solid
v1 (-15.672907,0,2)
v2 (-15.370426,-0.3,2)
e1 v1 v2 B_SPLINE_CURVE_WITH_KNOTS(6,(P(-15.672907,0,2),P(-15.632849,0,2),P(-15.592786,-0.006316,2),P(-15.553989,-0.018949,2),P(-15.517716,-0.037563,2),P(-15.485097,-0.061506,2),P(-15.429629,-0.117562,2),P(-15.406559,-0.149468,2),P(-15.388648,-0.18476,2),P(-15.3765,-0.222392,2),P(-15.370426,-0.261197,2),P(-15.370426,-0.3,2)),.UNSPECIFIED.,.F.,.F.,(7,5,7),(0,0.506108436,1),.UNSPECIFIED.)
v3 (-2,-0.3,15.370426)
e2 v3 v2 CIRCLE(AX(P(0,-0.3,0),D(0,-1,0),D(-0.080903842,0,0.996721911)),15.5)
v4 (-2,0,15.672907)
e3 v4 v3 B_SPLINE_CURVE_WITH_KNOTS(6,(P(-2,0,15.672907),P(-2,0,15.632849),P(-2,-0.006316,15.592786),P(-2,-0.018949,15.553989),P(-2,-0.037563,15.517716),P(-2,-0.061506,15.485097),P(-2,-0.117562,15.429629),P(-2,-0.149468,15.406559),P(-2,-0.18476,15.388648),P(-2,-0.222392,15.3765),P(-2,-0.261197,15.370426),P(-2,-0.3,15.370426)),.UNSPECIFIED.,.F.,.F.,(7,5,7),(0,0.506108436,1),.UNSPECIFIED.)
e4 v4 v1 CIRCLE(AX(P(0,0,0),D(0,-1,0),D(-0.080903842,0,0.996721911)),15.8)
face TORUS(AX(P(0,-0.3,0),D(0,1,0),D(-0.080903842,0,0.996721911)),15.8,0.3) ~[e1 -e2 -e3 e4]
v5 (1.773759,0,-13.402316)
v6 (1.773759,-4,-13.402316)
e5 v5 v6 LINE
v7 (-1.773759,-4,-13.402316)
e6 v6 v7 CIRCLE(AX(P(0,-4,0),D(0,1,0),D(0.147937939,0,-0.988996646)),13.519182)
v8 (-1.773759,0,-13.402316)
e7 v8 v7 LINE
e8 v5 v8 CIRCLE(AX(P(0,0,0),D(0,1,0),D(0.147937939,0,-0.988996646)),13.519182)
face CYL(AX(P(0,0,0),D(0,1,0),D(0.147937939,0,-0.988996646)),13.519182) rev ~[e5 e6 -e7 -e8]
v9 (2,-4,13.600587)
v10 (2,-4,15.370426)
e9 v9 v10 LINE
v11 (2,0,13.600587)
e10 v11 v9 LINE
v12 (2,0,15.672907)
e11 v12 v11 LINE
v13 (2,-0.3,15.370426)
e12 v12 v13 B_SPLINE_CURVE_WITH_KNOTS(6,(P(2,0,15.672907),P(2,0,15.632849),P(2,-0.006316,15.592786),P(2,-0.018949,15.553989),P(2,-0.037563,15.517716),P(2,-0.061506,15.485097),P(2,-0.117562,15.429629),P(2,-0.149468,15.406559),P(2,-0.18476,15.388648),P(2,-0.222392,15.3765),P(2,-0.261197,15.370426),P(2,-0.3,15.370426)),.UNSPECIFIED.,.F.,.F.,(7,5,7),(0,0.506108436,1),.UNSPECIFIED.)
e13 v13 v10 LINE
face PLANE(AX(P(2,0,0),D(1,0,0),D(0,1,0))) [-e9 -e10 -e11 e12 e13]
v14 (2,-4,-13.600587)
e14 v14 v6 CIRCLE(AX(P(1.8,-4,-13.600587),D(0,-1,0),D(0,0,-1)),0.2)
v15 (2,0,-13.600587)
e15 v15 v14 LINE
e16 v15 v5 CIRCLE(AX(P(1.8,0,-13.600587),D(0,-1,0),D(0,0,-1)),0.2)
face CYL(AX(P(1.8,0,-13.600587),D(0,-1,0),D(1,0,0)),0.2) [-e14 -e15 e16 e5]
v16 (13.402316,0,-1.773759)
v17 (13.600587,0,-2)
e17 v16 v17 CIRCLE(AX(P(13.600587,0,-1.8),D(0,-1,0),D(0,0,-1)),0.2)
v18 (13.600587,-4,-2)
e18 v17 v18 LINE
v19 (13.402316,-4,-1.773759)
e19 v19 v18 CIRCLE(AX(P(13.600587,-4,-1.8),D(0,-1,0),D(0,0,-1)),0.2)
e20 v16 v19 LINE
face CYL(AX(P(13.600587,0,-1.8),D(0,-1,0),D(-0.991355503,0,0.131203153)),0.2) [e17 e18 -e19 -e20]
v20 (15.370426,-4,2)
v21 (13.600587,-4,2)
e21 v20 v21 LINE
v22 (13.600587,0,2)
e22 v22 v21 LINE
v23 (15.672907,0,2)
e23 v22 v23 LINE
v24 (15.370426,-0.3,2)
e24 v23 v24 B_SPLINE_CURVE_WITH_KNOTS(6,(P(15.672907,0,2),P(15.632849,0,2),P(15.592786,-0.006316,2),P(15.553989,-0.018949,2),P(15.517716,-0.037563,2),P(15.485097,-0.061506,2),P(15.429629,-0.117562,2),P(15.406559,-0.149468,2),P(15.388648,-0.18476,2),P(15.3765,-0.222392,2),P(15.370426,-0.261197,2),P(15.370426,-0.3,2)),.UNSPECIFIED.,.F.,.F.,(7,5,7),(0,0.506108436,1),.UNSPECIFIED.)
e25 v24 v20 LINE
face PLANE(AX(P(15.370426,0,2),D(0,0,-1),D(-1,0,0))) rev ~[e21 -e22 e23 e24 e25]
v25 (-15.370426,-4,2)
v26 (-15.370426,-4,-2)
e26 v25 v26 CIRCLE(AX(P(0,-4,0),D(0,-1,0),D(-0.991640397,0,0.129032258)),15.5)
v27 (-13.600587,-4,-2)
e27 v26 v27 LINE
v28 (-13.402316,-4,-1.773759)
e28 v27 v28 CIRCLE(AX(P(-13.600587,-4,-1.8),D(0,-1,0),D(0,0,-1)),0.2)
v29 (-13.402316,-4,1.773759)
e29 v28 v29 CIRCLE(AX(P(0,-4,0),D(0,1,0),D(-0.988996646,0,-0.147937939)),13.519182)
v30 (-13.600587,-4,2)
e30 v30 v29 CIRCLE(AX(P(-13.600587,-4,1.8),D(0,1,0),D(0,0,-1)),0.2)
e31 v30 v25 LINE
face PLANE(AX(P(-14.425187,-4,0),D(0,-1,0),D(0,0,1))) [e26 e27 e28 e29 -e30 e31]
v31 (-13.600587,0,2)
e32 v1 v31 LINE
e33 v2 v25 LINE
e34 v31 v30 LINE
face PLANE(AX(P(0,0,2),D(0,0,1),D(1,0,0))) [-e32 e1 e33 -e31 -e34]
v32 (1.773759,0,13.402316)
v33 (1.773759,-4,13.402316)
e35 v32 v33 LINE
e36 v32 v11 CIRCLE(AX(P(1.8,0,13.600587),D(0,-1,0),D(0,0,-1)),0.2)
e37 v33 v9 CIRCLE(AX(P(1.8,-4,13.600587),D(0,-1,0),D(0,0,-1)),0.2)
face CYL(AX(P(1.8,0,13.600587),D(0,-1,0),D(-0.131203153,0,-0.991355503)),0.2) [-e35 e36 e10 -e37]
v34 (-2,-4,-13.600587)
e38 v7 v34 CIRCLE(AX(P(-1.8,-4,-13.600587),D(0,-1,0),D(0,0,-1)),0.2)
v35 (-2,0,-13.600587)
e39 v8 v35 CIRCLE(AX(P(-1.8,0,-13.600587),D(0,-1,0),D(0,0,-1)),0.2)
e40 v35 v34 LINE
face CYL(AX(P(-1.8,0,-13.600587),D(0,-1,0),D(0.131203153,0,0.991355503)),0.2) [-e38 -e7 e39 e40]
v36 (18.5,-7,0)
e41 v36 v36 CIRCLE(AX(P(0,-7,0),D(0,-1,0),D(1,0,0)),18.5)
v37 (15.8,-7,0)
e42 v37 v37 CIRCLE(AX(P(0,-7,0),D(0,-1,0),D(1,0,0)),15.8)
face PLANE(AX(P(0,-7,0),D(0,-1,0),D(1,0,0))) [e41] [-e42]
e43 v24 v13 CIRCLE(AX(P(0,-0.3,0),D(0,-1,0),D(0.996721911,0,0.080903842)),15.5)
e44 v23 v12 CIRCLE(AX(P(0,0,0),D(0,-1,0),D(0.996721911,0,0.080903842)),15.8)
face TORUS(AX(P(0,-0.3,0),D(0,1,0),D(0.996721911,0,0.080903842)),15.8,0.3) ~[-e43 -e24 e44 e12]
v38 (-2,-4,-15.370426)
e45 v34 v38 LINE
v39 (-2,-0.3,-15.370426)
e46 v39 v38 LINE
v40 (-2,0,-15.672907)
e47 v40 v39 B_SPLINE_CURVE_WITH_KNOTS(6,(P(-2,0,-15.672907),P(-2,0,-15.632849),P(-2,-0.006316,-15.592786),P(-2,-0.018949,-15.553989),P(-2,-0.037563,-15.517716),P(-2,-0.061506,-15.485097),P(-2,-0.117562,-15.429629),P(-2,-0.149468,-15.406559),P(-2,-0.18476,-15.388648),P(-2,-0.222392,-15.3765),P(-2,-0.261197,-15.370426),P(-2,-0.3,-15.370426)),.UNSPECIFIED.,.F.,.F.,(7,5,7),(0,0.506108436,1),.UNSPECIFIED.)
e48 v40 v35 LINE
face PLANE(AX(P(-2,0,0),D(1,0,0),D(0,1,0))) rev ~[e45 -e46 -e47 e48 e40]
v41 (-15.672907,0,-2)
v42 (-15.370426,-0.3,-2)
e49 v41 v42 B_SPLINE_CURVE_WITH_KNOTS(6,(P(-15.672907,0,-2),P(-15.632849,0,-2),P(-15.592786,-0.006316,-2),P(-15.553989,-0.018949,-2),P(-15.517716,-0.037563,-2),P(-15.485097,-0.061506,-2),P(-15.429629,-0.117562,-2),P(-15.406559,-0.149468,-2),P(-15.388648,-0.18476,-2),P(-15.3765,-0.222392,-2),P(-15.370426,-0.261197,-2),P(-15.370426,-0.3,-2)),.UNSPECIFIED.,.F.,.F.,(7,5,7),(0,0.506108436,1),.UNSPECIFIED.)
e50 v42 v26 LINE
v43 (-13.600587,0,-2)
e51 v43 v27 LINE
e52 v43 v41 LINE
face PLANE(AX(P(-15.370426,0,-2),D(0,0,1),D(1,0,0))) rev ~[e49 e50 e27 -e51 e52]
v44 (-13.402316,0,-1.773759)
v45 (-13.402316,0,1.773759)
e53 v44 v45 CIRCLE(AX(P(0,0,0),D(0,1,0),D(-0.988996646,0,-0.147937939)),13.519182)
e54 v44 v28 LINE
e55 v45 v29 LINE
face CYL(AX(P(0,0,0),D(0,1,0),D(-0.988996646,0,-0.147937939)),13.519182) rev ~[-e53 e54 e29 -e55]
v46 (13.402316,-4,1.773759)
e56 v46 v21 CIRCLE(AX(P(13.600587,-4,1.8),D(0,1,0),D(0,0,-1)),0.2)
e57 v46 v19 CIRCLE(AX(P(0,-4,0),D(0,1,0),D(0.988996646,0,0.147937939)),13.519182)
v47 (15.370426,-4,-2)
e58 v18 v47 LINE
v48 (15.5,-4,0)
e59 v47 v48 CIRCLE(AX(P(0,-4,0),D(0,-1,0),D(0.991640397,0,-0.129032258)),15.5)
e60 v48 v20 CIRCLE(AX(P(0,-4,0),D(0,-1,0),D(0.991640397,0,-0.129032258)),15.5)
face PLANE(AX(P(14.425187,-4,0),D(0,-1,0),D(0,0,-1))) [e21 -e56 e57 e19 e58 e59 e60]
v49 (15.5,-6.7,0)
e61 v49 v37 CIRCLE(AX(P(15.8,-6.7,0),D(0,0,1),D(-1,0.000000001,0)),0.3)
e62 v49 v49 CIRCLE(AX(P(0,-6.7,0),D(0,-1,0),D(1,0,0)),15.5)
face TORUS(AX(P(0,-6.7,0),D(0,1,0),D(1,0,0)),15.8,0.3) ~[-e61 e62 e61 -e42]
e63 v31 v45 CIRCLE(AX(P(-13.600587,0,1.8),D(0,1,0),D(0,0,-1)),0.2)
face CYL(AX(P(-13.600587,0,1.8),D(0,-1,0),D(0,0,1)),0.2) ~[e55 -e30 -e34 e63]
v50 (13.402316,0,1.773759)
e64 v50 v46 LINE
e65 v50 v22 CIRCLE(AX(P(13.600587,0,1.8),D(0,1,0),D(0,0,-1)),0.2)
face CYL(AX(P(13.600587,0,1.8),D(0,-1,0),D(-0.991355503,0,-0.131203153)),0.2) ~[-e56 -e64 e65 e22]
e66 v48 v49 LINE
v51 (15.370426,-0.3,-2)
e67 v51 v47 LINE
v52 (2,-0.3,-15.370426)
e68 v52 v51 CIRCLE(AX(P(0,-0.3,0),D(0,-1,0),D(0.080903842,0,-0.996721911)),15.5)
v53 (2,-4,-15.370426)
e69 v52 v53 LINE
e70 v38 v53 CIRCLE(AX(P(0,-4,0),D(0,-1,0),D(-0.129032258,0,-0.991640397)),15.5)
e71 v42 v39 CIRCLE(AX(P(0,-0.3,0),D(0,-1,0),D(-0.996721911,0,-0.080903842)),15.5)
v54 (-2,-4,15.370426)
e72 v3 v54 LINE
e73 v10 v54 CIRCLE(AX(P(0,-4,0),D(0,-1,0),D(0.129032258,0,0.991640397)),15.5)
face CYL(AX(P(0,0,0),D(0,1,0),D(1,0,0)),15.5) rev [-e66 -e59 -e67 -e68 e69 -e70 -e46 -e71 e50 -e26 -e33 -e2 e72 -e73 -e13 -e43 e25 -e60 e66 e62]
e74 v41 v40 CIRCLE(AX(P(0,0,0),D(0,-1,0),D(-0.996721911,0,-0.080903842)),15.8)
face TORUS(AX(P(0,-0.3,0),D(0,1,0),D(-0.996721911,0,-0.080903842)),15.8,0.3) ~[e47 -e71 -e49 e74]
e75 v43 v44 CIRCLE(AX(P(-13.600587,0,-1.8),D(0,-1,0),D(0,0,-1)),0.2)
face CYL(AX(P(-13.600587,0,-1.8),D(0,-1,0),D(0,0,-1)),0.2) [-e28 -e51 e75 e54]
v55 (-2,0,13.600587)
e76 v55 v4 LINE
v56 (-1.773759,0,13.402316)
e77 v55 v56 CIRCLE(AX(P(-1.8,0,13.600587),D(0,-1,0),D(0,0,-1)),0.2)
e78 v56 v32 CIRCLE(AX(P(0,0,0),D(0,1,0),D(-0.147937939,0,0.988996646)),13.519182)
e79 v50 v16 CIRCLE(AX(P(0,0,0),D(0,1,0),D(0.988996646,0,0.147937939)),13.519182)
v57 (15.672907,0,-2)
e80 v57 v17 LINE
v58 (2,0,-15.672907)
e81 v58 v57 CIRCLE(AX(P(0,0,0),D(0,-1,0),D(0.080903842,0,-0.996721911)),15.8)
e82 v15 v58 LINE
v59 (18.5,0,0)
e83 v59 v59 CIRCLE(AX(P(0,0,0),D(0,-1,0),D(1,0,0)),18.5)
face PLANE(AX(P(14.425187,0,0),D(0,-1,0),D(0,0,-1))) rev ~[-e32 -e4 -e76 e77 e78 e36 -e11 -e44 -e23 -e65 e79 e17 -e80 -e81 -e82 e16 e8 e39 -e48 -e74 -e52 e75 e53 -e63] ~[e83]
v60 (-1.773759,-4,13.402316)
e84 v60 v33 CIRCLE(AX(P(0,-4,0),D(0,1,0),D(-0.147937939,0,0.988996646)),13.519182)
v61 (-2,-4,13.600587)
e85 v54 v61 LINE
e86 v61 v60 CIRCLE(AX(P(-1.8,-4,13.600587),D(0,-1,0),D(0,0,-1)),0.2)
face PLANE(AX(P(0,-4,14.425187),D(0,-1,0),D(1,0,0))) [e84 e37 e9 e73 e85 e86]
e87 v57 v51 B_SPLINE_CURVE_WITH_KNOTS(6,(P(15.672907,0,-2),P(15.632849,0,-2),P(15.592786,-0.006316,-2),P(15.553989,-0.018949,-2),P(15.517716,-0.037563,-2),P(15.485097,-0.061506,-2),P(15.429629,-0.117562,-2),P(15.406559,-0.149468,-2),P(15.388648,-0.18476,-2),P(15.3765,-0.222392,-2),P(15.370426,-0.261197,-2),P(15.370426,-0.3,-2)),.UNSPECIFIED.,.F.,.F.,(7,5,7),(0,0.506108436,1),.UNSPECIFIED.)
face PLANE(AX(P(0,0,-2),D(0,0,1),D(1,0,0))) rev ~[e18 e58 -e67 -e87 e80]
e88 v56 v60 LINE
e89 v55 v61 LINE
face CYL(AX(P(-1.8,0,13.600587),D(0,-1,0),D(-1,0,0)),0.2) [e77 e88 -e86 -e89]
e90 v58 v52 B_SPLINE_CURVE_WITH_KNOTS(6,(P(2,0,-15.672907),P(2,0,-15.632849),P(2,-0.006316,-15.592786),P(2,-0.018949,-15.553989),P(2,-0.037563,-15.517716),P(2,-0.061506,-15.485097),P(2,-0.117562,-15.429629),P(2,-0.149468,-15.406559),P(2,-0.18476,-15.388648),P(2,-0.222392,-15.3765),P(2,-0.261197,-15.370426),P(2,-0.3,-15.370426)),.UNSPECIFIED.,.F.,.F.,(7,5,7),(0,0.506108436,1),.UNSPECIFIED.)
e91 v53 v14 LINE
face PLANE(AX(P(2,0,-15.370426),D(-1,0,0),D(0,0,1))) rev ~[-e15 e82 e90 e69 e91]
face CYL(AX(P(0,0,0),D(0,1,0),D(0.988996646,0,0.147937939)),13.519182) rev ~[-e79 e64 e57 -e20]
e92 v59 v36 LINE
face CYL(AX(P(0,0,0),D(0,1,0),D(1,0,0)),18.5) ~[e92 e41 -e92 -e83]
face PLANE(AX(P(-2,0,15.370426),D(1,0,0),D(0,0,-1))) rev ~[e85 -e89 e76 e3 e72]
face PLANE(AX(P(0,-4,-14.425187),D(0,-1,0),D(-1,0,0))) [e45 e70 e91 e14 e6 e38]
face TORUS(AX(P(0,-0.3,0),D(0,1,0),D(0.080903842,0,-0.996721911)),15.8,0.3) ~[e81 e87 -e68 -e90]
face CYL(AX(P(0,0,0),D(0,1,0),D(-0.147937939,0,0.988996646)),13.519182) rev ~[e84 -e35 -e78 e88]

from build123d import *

# Parameters (mm, degrees)
F0_R            = 18.5
F0_R_2          = 15.5
F1_DEPTH        = 7
F3_DEPTH        = 4
F3_COPIES_COUNT = 4
F4_R            = 0.2
F5_T6_ANGLE     = 80.7189590371
F5_T12_ANGLE    = 80.7189590371
F5_T18_ANGLE    = 80.7189590371
F5_T24_ANGLE    = 80.7189590371


# Not quite as in the source:
# - a fillet or chamfer that OpenCascade refuses, or shapes differently, is made with other operations: its cross-section is extruded or revolved along the edge and cut away or added
# - a pattern or mirror of a feature is missing from the dataset's text; its kind, count and spacing are read off the source's solid


with BuildPart() as f1:
    # F0 (on Front) → F1 (new body)
    with BuildSketch(Plane.XZ):
        Circle(F0_R)
        Circle(F0_R_2, mode=Mode.SUBTRACT)
    extrude(amount=F1_DEPTH)

    # F2 (on Front) → F3 (join)
    with BuildSketch(Plane.XZ):
        with BuildLine():
            ThreePointArc((-2, 13.3704261489), (0, 13.5191824976), (2, 13.3704261489))
            Line((2, 13.3704261489), (2, 15.3704261489))
            ThreePointArc((2, 15.3704261489), (0, 15.5), (-2, 15.3704261489))
            Line((-2, 15.3704261489), (-2, 13.3704261489))
        make_face()
    f3 = extrude(amount=F3_DEPTH)

    # F3_copies: F3 ×4 about axis
    f3_copies_axis = Axis((0, 0, 0), (0, 1, 0))
    for i in range(1, F3_COPIES_COUNT):
        add(f3.rotate(f3_copies_axis, i * 360 / F3_COPIES_COUNT))

    # F4
    f4_edges = [f1.edges().sort_by_distance(p)[0] for p in [
        (2, -2, 13.370426),
        (-2, -2, 13.370426),
        (13.370426, -2, 2),
        (13.370426, -2, -2),
        (2, -2, -13.370426),
        (-2, -2, -13.370426),
        (-13.370426, -2, 2),
        (-13.370426, -2, -2),
    ]]
    fillet(f4_edges, radius=F4_R)

    # F5: fillet of radius 0.3 on 5 edges, made by hand

    # F5_s1 → F5_t2 (revolve, cut)
    with BuildSketch(Plane.XY):
        with BuildLine():
            ThreePointArc((15.5, -6.7), (15.5878679656, -6.9121320344), (15.8, -7))
            Line((15.8, -7), (15.5, -7))
            Line((15.5, -7), (15.5, -6.7))
        make_face()
    revolve(axis=Axis((0, -7, 0), (0, -1, 0)), mode=Mode.SUBTRACT)


with BuildPart() as f5_tool4:
    # F5_s5 → F5_t6 (revolve)
    with BuildSketch(Plane(origin=(0, 0, 0), x_dir=(0, 1, 0), z_dir=(0.080903842, 0, -0.9967219112))):
        with BuildLine():
            ThreePointArc((0, 15.8), (-0.0878679656, 15.5878679656), (-0.3, 15.5))
            Line((-0.3, 15.5), (0, 15.5))
            Line((0, 15.5), (0, 15.8))
        make_face()
    revolve(axis=Axis((0, 0, 0), (0, -1, 0)), revolution_arc=F5_T6_ANGLE)

    split(bisect_by=Plane.XY.offset(2), keep=Keep.TOP)

    split(bisect_by=Plane.YZ.offset(2), keep=Keep.TOP)


with BuildPart() as f1_1:
    add(f1.part)

    # F5_t3: cut F5_tool4
    add(f5_tool4.part, mode=Mode.SUBTRACT)


with BuildPart() as f5_tool10:
    # F5_s11 → F5_t12 (revolve)
    with BuildSketch(Plane(origin=(0, 0, 0), x_dir=(0, 1, 0), z_dir=(-0.9967219112, 0, -0.080903842))):
        with BuildLine():
            ThreePointArc((0, 15.8), (-0.0878679656, 15.5878679656), (-0.3, 15.5))
            Line((-0.3, 15.5), (0, 15.5))
            Line((0, 15.5), (0, 15.8))
        make_face()
    revolve(axis=Axis((0, 0, 0), (0, -1, 0)), revolution_arc=F5_T12_ANGLE)

    split(bisect_by=Plane.XY.offset(-2), keep=Keep.BOTTOM)

    split(bisect_by=Plane.YZ.offset(2), keep=Keep.TOP)


with BuildPart() as f1_2:
    add(f1_1.part)

    # F5_t9: cut F5_tool10
    add(f5_tool10.part, mode=Mode.SUBTRACT)


with BuildPart() as f5_tool16:
    # F5_s17 → F5_t18 (revolve)
    with BuildSketch(Plane(origin=(0, 0, 0), x_dir=(0, 1, 0), z_dir=(0.9967219112, 0, 0.080903842))):
        with BuildLine():
            ThreePointArc((0, 15.8), (-0.0878679656, 15.5878679656), (-0.3, 15.5))
            Line((-0.3, 15.5), (0, 15.5))
            Line((0, 15.5), (0, 15.8))
        make_face()
    revolve(axis=Axis((0, 0, 0), (0, -1, 0)), revolution_arc=F5_T18_ANGLE)

    split(bisect_by=Plane.YZ.offset(-2), keep=Keep.BOTTOM)

    split(bisect_by=Plane.XY.offset(2), keep=Keep.TOP)


with BuildPart() as f1_3:
    add(f1_2.part)

    # F5_t15: cut F5_tool16
    add(f5_tool16.part, mode=Mode.SUBTRACT)


with BuildPart() as f5_tool22:
    # F5_s23 → F5_t24 (revolve)
    with BuildSketch(Plane(origin=(0, 0, 0), x_dir=(0, 1, 0), z_dir=(-0.080903842, 0, 0.9967219112))):
        with BuildLine():
            ThreePointArc((0, 15.8), (-0.0878679656, 15.5878679656), (-0.3, 15.5))
            Line((-0.3, 15.5), (0, 15.5))
            Line((0, 15.5), (0, 15.8))
        make_face()
    revolve(axis=Axis((0, 0, 0), (0, -1, 0)), revolution_arc=F5_T24_ANGLE)

    split(bisect_by=Plane.YZ.offset(-2), keep=Keep.BOTTOM)

    split(bisect_by=Plane.XY.offset(-2), keep=Keep.BOTTOM)


with BuildPart() as f1_4:
    add(f1_3.part)

    # F5_t21: cut F5_tool22
    add(f5_tool22.part, mode=Mode.SUBTRACT)


solid = f1_4.part
